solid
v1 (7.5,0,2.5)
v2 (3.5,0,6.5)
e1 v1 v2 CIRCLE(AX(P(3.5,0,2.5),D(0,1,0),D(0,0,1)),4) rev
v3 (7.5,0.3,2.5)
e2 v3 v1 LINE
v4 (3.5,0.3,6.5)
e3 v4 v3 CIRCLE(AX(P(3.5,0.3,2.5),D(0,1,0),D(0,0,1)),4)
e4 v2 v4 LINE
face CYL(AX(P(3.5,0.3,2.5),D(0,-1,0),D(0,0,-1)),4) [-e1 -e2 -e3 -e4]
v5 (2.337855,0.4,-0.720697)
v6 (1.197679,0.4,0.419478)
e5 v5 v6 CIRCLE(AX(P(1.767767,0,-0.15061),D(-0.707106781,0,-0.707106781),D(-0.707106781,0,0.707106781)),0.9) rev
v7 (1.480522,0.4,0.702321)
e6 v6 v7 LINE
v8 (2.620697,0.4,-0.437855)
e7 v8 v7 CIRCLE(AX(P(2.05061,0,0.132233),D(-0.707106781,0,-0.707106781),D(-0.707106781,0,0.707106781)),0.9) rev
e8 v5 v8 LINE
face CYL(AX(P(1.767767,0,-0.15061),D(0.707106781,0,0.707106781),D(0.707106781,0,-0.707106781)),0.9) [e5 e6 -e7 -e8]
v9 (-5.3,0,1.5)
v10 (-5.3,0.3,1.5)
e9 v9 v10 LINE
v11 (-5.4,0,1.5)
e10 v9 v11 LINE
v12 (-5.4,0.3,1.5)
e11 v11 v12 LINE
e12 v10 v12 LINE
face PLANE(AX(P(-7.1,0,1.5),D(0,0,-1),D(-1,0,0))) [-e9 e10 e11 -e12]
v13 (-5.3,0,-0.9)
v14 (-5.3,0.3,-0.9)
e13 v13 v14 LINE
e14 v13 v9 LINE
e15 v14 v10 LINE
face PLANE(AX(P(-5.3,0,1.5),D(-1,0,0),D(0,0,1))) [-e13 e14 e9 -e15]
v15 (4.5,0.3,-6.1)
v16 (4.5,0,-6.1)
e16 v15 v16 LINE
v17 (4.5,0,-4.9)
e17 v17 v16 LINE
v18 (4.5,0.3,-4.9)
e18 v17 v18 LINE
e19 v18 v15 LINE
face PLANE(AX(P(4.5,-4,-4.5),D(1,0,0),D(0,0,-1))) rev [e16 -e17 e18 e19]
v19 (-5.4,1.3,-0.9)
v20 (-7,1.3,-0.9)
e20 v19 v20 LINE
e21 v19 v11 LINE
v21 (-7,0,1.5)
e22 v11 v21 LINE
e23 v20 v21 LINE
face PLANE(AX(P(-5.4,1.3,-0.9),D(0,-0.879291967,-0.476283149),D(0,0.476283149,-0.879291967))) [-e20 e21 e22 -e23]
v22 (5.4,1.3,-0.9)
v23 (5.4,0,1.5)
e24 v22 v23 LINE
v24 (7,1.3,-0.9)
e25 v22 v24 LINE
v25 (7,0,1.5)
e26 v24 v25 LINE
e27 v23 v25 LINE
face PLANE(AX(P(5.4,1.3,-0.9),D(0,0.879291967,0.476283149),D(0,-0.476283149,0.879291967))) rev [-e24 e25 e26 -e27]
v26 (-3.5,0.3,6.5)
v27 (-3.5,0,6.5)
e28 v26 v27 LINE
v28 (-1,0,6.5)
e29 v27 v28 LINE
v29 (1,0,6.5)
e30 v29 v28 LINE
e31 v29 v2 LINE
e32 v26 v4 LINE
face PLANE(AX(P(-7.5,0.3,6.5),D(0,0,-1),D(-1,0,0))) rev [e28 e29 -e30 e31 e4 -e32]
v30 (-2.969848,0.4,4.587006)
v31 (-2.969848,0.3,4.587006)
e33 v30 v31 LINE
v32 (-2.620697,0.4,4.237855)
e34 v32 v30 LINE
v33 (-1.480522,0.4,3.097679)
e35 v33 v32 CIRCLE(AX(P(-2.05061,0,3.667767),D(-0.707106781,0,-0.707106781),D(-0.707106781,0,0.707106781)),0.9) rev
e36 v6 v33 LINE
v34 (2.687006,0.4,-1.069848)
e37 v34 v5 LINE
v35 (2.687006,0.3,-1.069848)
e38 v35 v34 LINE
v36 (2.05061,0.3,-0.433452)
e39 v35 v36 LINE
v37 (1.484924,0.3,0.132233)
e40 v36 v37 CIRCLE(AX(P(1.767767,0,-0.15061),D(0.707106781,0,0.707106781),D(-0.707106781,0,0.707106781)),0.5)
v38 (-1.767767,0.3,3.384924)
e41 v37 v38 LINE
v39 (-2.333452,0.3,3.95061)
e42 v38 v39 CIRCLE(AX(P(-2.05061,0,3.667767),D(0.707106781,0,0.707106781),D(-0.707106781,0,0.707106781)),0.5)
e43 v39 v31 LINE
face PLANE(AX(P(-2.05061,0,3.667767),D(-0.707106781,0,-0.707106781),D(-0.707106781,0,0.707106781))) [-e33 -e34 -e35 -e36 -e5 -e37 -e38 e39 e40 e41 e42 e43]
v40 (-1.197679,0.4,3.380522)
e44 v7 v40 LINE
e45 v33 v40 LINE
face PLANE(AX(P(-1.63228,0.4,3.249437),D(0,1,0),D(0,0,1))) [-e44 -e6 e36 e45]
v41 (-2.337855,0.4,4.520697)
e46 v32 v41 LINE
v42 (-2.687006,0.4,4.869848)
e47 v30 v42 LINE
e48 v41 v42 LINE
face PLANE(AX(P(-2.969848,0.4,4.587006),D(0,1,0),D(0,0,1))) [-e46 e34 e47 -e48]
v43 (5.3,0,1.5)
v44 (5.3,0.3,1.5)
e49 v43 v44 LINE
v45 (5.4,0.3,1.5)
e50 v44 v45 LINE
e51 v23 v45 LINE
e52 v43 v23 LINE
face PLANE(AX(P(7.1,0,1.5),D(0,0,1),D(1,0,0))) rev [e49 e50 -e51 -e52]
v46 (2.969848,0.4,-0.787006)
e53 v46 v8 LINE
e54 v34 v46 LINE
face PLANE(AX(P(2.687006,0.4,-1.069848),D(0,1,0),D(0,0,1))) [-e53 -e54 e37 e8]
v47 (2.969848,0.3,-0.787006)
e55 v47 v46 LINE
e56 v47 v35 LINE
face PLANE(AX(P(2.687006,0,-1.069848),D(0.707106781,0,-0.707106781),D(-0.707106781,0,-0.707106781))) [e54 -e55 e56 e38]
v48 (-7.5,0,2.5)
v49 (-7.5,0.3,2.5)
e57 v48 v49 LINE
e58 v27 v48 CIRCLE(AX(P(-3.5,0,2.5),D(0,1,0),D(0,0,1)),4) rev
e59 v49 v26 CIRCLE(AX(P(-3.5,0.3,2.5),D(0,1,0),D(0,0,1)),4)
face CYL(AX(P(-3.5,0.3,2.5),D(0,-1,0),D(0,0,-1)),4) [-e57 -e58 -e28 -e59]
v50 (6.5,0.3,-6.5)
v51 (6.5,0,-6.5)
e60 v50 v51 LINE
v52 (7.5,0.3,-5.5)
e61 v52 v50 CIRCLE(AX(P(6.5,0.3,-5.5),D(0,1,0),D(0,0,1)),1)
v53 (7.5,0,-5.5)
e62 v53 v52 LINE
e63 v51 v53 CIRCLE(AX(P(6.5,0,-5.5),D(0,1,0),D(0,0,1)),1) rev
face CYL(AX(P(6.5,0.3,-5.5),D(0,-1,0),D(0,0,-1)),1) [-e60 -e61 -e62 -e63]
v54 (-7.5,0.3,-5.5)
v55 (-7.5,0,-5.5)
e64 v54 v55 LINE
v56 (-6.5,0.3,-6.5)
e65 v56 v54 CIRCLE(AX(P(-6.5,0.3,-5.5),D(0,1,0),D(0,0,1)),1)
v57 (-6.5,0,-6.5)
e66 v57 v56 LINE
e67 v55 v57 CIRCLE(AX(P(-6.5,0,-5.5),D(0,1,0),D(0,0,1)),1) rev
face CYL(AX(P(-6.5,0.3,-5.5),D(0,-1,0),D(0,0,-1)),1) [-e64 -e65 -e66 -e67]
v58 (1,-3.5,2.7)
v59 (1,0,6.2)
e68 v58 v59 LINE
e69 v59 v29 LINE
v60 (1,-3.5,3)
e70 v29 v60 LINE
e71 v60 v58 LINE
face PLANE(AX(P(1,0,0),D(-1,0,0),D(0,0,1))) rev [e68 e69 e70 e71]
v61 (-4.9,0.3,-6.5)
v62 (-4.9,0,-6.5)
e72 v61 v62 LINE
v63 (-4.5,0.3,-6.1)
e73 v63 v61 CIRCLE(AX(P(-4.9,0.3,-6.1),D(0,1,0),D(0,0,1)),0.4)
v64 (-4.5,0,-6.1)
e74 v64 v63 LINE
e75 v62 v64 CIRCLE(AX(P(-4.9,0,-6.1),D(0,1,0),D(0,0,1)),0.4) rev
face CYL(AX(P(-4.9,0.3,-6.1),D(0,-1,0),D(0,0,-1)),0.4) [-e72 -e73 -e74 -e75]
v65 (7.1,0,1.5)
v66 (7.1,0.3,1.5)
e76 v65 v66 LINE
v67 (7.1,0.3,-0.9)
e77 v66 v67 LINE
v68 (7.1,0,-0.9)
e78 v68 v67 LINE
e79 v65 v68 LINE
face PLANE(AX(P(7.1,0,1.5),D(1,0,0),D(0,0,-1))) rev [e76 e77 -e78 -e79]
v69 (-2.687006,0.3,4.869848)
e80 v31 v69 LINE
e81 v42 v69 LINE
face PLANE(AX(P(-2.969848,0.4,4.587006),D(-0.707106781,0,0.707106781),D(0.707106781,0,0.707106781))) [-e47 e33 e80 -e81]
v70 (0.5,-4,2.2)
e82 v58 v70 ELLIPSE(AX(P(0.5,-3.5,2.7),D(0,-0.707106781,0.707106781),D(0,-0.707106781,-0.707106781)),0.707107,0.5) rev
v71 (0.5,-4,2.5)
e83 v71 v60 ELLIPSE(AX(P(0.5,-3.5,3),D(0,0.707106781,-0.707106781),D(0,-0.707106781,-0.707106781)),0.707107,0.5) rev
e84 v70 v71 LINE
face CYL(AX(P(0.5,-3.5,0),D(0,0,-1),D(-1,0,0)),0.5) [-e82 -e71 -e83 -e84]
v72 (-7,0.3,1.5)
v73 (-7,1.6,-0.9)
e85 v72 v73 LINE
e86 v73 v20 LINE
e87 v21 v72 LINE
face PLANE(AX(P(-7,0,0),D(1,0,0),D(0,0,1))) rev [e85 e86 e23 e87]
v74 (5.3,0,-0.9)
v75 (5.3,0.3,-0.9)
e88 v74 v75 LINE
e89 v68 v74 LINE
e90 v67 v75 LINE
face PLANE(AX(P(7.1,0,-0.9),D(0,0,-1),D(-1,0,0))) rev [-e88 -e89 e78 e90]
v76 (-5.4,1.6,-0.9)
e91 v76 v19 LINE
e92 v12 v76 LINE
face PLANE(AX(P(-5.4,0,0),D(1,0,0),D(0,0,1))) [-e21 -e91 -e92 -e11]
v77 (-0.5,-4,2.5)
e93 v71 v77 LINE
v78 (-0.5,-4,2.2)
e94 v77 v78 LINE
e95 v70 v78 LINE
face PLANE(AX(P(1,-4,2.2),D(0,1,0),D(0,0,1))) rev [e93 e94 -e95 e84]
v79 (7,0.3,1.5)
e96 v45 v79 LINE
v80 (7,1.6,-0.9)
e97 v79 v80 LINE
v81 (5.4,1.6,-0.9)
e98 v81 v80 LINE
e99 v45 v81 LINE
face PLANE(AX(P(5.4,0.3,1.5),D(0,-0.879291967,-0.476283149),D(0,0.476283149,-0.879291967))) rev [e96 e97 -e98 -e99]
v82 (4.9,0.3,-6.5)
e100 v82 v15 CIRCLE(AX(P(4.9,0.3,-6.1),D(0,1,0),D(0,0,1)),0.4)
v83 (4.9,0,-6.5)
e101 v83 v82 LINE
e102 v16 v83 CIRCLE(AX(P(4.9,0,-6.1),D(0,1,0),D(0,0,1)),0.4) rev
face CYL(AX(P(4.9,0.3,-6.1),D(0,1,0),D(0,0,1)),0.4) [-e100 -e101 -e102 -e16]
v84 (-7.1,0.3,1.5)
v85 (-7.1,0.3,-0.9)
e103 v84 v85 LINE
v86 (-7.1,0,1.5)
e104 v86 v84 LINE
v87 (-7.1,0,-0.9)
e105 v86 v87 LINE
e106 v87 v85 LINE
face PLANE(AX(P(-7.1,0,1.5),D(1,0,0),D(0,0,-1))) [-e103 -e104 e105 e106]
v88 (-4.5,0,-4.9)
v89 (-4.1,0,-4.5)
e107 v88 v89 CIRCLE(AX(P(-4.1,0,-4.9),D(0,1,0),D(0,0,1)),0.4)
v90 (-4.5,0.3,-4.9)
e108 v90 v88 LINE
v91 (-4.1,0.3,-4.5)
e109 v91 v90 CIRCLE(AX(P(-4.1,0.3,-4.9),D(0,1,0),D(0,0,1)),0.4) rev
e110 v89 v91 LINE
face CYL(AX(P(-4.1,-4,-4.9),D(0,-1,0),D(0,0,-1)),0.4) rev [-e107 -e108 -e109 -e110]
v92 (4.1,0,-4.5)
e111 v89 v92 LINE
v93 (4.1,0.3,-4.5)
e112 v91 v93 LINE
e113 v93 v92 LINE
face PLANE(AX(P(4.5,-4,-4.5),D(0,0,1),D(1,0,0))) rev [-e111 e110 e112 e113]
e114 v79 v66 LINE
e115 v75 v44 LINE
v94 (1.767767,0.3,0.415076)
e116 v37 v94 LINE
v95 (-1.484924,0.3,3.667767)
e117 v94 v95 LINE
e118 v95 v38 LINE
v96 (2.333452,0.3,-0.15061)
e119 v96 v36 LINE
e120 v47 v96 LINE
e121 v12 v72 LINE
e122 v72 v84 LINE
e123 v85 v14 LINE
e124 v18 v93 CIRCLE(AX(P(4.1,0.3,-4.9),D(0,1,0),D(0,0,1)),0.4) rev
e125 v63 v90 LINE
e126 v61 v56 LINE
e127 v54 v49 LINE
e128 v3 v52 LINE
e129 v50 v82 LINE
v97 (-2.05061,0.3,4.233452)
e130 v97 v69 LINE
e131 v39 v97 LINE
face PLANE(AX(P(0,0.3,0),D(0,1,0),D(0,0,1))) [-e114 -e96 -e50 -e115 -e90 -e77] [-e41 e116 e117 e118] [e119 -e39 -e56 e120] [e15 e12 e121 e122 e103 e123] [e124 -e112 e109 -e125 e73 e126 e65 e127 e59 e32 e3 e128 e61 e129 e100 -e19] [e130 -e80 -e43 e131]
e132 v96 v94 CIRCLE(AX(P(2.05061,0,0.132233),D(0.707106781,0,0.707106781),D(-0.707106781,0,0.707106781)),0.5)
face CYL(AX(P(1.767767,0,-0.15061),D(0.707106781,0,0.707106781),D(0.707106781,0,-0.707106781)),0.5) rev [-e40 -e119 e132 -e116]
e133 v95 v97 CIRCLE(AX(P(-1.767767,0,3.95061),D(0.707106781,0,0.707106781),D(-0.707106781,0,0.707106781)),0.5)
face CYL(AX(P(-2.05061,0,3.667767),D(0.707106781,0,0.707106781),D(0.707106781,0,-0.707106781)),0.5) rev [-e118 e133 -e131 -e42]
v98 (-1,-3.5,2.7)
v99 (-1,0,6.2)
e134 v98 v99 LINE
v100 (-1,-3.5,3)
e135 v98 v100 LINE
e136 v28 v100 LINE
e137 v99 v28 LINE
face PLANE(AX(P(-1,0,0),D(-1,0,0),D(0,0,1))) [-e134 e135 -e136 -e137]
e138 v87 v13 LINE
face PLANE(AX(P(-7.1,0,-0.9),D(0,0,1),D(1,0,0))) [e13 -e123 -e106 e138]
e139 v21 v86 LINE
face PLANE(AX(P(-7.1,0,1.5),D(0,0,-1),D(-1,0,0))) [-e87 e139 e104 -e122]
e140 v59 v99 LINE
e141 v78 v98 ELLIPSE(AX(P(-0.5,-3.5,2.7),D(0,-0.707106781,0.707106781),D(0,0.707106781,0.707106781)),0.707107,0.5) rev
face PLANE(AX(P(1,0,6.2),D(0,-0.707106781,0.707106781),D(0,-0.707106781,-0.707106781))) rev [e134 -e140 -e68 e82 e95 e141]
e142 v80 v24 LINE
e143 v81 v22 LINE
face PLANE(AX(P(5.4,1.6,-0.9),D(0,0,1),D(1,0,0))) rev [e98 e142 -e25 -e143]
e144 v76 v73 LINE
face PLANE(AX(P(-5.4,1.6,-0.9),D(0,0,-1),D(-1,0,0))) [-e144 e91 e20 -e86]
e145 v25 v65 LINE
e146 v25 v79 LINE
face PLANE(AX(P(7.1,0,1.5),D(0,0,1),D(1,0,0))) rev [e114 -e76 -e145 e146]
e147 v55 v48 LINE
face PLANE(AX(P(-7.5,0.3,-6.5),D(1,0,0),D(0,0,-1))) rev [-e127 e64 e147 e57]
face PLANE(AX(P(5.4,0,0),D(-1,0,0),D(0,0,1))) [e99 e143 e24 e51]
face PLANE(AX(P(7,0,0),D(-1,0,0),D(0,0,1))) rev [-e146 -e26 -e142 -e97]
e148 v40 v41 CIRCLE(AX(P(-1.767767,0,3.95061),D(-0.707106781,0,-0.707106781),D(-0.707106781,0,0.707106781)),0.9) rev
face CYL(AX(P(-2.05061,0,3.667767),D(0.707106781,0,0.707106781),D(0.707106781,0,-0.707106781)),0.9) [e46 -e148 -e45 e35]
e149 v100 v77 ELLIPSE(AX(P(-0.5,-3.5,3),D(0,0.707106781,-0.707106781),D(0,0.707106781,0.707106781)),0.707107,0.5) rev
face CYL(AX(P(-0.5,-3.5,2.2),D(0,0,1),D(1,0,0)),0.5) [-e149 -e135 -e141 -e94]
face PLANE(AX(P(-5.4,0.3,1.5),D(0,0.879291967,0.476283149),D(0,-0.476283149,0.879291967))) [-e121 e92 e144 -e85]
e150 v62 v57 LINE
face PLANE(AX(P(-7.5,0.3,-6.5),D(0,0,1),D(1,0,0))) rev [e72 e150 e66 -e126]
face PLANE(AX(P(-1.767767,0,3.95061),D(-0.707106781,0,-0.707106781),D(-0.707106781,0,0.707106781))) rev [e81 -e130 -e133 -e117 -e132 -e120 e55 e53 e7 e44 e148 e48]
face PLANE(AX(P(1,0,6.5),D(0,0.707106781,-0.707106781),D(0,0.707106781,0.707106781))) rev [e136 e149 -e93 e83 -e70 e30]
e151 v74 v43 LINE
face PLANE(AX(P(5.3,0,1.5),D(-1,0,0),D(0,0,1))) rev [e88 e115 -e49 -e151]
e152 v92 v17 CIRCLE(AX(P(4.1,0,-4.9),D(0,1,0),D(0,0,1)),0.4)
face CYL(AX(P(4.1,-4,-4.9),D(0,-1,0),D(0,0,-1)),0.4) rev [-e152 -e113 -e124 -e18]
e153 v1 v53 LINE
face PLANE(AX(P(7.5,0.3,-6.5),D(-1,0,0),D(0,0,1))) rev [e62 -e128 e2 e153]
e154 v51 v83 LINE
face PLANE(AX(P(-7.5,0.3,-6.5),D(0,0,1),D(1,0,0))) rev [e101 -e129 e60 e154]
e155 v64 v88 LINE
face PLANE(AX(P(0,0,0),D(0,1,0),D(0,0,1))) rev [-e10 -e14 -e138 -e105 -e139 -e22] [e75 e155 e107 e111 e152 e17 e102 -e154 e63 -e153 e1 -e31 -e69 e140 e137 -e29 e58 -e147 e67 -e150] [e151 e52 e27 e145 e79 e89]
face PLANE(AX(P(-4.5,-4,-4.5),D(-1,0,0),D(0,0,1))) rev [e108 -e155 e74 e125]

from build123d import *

# Parameters (mm, degrees)
SKETCH1_W               = 15
SKETCH1_H               = 13
BASE_DEPTH              = 0.3
SKETCH7_W               = 1.8
SKETCH7_H               = 2.4
LOCKING_CLAMP_CUT_DEPTH = 10.92924972
LOCKING_CLAMP_DEPTH     = 0.8
SPRING_CLASP_DEPTH      = 0.2
WIRE_CONNECTION_DEPTH   = 1
SKETCH14_W              = 9
SKETCH14_H              = 2
BOTTOM_SLOT_CUT_DEPTH   = 11.816191566
TS_F_R                  = 1
BS_F_R                  = 4
WC_F_R                  = 0.5
BSC_F_R                 = 0.4


with BuildPart() as part:
    # Sketch1 → BASE (new body)
    with BuildSketch(Plane(origin=(0, 0, 0), x_dir=(1, 0, 0), z_dir=(0, 1, 0))):
        Rectangle(SKETCH1_W, SKETCH1_H)
    extrude(amount=BASE_DEPTH)

    # Sketch7 → LOCKING CLAMP CUT (cut, through all)
    with BuildSketch(Plane(origin=(0, 0.3, 0), x_dir=(1, 0, 0), z_dir=(0, 1, 0))):
        with Locations((6.2, -0.3)):
            Rectangle(SKETCH7_W, SKETCH7_H)
    locking_clamp_cut = extrude(amount=-LOCKING_CLAMP_CUT_DEPTH, mode=Mode.SUBTRACT)

    # Sketch9 → LOCKING CLAMP (add, symmetric)
    with BuildSketch(Plane.ZY.offset(-6.2)):
        Polygon((1.5, 0.3), (-0.9, 1.6), (-0.9, 1.3), (1.5, 0), align=None)
    locking_clamp = extrude(amount=LOCKING_CLAMP_DEPTH, both=True)

    # LC M: LOCKING CLAMP CUT, LOCKING CLAMP across plane
    add(locking_clamp_cut.mirror(Plane(origin=(0, 0, 0), x_dir=(0, 0, 1), z_dir=(1, 0, 0))), mode=Mode.SUBTRACT)
    add(locking_clamp.mirror(Plane(origin=(0, 0, 0), x_dir=(0, 0, 1), z_dir=(1, 0, 0))))

    # Sketch11 → SPRING CLASP (add, symmetric)
    with BuildSketch(Plane(origin=(0.95, 0, 0.95), x_dir=(-0.7071067811865436, 0, 0.7071067811865516), z_dir=(-0.7071067811865516, 0, -0.7071067811865436))):
        with BuildLine():
            Line((5.343502884, 0), (4.635110863, 0))
            ThreePointArc((4.635110863, 0), (4.57056114, 0.023623738), (4.536509533, 0.083333333))
            ThreePointArc((4.536509533, 0.083333333), (4.043502884, 0.5), (3.550496236, 0.083333333))
            ThreePointArc((3.550496236, 0.083333333), (3.516444628, 0.023623738), (3.451894906, 0))
            Line((3.451894906, 0), (-0.764889137, 0))
            ThreePointArc((-0.764889137, 0), (-0.82943886, 0.023623738), (-0.863490467, 0.083333333))
            ThreePointArc((-0.863490467, 0.083333333), (-1.356497116, 0.5), (-1.849503764, 0.083333333))
            ThreePointArc((-1.849503764, 0.083333333), (-1.883555372, 0.023623738), (-1.948105094, 0))
            Line((-1.948105094, 0), (-2.656497116, 0))
            Line((-2.656497116, 0), (-2.656497116, 0.4))
            Line((-2.656497116, 0.4), (-2.162722891, 0.4))
            ThreePointArc((-2.162722891, 0.4), (-1.356497116, 0.9), (-0.550271341, 0.4))
            Line((-0.550271341, 0.4), (3.237277109, 0.4))
            ThreePointArc((3.237277109, 0.4), (4.043502884, 0.9), (4.849728659, 0.4))
            Line((4.849728659, 0.4), (5.343502884, 0.4))
            Line((5.343502884, 0.4), (5.343502884, 0))
        make_face()
    extrude(amount=SPRING_CLASP_DEPTH, both=True)

    # Sketch13 → WIRE CONNECTION (add, symmetric)
    with BuildSketch(Plane(origin=(0, 0, 0), x_dir=(0, 0, -1), z_dir=(1, 0, 0))):
        Polygon((-6.5, 0), (-2.5, -4), (-2.2, -4), (-6.2, 0), align=None)
    extrude(amount=WIRE_CONNECTION_DEPTH, both=True)

    # Sketch14 → BOTTOM SLOT CUT (cut, through all)
    with BuildSketch(Plane(origin=(0, 0.3, 0), x_dir=(1, 0, 0), z_dir=(0, 1, 0))):
        with Locations((0, 5.5)):
            Rectangle(SKETCH14_W, SKETCH14_H)
    extrude(amount=-BOTTOM_SLOT_CUT_DEPTH, mode=Mode.SUBTRACT)

    # TS F
    ts_f_edges = [part.edges().sort_by_distance(p)[0] for p in [
        (-7.5, 0.15, -6.5),
        (7.5, 0.15, -6.5),
    ]]
    fillet(ts_f_edges, radius=TS_F_R)

    # BS F
    bs_f_edges = [part.edges().sort_by_distance(p)[0] for p in [
        (7.5, 0.15, 6.5),
        (-7.5, 0.15, 6.5),
    ]]
    fillet(bs_f_edges, radius=BS_F_R)

    # WC F
    # the kernel refuses this fillet: 0.5 mm, written as the material it takes off along each edge
    with BuildSketch(Plane(origin=(-1, -4, 3.75), x_dir=(0, 1, 0), z_dir=(0, 0, -1))) as wc_f_piece_1:
        with BuildLine():
            CenterArc((WC_F_R, WC_F_R), WC_F_R, 180, 90)
            Line((0, WC_F_R), (0, 0))
            Line((0, 0), (WC_F_R, 0))
        make_face()
    extrude(amount=2.8, mode=Mode.SUBTRACT)
    with BuildSketch(Plane(origin=(1, -4, 3.75), x_dir=(0, 1, 0), z_dir=(0, 0, -1))) as wc_f_piece_2:
        with BuildLine():
            CenterArc((WC_F_R, -WC_F_R), WC_F_R, 90, 90)
            Line((0, -WC_F_R), (0, 0))
            Line((0, 0), (WC_F_R, 0))
        make_face()
    extrude(amount=2.8, mode=Mode.SUBTRACT)

    # BSC F
    bsc_f_edges = [part.edges().sort_by_distance(p)[0] for p in [
        (4.5, 0.15, -6.5),
        (-4.5, 0.15, -6.5),
        (4.5, 0.15, -4.5),
        (-4.5, 0.15, -4.5),
    ]]
    fillet(bsc_f_edges, radius=BSC_F_R)


solid = part.part
